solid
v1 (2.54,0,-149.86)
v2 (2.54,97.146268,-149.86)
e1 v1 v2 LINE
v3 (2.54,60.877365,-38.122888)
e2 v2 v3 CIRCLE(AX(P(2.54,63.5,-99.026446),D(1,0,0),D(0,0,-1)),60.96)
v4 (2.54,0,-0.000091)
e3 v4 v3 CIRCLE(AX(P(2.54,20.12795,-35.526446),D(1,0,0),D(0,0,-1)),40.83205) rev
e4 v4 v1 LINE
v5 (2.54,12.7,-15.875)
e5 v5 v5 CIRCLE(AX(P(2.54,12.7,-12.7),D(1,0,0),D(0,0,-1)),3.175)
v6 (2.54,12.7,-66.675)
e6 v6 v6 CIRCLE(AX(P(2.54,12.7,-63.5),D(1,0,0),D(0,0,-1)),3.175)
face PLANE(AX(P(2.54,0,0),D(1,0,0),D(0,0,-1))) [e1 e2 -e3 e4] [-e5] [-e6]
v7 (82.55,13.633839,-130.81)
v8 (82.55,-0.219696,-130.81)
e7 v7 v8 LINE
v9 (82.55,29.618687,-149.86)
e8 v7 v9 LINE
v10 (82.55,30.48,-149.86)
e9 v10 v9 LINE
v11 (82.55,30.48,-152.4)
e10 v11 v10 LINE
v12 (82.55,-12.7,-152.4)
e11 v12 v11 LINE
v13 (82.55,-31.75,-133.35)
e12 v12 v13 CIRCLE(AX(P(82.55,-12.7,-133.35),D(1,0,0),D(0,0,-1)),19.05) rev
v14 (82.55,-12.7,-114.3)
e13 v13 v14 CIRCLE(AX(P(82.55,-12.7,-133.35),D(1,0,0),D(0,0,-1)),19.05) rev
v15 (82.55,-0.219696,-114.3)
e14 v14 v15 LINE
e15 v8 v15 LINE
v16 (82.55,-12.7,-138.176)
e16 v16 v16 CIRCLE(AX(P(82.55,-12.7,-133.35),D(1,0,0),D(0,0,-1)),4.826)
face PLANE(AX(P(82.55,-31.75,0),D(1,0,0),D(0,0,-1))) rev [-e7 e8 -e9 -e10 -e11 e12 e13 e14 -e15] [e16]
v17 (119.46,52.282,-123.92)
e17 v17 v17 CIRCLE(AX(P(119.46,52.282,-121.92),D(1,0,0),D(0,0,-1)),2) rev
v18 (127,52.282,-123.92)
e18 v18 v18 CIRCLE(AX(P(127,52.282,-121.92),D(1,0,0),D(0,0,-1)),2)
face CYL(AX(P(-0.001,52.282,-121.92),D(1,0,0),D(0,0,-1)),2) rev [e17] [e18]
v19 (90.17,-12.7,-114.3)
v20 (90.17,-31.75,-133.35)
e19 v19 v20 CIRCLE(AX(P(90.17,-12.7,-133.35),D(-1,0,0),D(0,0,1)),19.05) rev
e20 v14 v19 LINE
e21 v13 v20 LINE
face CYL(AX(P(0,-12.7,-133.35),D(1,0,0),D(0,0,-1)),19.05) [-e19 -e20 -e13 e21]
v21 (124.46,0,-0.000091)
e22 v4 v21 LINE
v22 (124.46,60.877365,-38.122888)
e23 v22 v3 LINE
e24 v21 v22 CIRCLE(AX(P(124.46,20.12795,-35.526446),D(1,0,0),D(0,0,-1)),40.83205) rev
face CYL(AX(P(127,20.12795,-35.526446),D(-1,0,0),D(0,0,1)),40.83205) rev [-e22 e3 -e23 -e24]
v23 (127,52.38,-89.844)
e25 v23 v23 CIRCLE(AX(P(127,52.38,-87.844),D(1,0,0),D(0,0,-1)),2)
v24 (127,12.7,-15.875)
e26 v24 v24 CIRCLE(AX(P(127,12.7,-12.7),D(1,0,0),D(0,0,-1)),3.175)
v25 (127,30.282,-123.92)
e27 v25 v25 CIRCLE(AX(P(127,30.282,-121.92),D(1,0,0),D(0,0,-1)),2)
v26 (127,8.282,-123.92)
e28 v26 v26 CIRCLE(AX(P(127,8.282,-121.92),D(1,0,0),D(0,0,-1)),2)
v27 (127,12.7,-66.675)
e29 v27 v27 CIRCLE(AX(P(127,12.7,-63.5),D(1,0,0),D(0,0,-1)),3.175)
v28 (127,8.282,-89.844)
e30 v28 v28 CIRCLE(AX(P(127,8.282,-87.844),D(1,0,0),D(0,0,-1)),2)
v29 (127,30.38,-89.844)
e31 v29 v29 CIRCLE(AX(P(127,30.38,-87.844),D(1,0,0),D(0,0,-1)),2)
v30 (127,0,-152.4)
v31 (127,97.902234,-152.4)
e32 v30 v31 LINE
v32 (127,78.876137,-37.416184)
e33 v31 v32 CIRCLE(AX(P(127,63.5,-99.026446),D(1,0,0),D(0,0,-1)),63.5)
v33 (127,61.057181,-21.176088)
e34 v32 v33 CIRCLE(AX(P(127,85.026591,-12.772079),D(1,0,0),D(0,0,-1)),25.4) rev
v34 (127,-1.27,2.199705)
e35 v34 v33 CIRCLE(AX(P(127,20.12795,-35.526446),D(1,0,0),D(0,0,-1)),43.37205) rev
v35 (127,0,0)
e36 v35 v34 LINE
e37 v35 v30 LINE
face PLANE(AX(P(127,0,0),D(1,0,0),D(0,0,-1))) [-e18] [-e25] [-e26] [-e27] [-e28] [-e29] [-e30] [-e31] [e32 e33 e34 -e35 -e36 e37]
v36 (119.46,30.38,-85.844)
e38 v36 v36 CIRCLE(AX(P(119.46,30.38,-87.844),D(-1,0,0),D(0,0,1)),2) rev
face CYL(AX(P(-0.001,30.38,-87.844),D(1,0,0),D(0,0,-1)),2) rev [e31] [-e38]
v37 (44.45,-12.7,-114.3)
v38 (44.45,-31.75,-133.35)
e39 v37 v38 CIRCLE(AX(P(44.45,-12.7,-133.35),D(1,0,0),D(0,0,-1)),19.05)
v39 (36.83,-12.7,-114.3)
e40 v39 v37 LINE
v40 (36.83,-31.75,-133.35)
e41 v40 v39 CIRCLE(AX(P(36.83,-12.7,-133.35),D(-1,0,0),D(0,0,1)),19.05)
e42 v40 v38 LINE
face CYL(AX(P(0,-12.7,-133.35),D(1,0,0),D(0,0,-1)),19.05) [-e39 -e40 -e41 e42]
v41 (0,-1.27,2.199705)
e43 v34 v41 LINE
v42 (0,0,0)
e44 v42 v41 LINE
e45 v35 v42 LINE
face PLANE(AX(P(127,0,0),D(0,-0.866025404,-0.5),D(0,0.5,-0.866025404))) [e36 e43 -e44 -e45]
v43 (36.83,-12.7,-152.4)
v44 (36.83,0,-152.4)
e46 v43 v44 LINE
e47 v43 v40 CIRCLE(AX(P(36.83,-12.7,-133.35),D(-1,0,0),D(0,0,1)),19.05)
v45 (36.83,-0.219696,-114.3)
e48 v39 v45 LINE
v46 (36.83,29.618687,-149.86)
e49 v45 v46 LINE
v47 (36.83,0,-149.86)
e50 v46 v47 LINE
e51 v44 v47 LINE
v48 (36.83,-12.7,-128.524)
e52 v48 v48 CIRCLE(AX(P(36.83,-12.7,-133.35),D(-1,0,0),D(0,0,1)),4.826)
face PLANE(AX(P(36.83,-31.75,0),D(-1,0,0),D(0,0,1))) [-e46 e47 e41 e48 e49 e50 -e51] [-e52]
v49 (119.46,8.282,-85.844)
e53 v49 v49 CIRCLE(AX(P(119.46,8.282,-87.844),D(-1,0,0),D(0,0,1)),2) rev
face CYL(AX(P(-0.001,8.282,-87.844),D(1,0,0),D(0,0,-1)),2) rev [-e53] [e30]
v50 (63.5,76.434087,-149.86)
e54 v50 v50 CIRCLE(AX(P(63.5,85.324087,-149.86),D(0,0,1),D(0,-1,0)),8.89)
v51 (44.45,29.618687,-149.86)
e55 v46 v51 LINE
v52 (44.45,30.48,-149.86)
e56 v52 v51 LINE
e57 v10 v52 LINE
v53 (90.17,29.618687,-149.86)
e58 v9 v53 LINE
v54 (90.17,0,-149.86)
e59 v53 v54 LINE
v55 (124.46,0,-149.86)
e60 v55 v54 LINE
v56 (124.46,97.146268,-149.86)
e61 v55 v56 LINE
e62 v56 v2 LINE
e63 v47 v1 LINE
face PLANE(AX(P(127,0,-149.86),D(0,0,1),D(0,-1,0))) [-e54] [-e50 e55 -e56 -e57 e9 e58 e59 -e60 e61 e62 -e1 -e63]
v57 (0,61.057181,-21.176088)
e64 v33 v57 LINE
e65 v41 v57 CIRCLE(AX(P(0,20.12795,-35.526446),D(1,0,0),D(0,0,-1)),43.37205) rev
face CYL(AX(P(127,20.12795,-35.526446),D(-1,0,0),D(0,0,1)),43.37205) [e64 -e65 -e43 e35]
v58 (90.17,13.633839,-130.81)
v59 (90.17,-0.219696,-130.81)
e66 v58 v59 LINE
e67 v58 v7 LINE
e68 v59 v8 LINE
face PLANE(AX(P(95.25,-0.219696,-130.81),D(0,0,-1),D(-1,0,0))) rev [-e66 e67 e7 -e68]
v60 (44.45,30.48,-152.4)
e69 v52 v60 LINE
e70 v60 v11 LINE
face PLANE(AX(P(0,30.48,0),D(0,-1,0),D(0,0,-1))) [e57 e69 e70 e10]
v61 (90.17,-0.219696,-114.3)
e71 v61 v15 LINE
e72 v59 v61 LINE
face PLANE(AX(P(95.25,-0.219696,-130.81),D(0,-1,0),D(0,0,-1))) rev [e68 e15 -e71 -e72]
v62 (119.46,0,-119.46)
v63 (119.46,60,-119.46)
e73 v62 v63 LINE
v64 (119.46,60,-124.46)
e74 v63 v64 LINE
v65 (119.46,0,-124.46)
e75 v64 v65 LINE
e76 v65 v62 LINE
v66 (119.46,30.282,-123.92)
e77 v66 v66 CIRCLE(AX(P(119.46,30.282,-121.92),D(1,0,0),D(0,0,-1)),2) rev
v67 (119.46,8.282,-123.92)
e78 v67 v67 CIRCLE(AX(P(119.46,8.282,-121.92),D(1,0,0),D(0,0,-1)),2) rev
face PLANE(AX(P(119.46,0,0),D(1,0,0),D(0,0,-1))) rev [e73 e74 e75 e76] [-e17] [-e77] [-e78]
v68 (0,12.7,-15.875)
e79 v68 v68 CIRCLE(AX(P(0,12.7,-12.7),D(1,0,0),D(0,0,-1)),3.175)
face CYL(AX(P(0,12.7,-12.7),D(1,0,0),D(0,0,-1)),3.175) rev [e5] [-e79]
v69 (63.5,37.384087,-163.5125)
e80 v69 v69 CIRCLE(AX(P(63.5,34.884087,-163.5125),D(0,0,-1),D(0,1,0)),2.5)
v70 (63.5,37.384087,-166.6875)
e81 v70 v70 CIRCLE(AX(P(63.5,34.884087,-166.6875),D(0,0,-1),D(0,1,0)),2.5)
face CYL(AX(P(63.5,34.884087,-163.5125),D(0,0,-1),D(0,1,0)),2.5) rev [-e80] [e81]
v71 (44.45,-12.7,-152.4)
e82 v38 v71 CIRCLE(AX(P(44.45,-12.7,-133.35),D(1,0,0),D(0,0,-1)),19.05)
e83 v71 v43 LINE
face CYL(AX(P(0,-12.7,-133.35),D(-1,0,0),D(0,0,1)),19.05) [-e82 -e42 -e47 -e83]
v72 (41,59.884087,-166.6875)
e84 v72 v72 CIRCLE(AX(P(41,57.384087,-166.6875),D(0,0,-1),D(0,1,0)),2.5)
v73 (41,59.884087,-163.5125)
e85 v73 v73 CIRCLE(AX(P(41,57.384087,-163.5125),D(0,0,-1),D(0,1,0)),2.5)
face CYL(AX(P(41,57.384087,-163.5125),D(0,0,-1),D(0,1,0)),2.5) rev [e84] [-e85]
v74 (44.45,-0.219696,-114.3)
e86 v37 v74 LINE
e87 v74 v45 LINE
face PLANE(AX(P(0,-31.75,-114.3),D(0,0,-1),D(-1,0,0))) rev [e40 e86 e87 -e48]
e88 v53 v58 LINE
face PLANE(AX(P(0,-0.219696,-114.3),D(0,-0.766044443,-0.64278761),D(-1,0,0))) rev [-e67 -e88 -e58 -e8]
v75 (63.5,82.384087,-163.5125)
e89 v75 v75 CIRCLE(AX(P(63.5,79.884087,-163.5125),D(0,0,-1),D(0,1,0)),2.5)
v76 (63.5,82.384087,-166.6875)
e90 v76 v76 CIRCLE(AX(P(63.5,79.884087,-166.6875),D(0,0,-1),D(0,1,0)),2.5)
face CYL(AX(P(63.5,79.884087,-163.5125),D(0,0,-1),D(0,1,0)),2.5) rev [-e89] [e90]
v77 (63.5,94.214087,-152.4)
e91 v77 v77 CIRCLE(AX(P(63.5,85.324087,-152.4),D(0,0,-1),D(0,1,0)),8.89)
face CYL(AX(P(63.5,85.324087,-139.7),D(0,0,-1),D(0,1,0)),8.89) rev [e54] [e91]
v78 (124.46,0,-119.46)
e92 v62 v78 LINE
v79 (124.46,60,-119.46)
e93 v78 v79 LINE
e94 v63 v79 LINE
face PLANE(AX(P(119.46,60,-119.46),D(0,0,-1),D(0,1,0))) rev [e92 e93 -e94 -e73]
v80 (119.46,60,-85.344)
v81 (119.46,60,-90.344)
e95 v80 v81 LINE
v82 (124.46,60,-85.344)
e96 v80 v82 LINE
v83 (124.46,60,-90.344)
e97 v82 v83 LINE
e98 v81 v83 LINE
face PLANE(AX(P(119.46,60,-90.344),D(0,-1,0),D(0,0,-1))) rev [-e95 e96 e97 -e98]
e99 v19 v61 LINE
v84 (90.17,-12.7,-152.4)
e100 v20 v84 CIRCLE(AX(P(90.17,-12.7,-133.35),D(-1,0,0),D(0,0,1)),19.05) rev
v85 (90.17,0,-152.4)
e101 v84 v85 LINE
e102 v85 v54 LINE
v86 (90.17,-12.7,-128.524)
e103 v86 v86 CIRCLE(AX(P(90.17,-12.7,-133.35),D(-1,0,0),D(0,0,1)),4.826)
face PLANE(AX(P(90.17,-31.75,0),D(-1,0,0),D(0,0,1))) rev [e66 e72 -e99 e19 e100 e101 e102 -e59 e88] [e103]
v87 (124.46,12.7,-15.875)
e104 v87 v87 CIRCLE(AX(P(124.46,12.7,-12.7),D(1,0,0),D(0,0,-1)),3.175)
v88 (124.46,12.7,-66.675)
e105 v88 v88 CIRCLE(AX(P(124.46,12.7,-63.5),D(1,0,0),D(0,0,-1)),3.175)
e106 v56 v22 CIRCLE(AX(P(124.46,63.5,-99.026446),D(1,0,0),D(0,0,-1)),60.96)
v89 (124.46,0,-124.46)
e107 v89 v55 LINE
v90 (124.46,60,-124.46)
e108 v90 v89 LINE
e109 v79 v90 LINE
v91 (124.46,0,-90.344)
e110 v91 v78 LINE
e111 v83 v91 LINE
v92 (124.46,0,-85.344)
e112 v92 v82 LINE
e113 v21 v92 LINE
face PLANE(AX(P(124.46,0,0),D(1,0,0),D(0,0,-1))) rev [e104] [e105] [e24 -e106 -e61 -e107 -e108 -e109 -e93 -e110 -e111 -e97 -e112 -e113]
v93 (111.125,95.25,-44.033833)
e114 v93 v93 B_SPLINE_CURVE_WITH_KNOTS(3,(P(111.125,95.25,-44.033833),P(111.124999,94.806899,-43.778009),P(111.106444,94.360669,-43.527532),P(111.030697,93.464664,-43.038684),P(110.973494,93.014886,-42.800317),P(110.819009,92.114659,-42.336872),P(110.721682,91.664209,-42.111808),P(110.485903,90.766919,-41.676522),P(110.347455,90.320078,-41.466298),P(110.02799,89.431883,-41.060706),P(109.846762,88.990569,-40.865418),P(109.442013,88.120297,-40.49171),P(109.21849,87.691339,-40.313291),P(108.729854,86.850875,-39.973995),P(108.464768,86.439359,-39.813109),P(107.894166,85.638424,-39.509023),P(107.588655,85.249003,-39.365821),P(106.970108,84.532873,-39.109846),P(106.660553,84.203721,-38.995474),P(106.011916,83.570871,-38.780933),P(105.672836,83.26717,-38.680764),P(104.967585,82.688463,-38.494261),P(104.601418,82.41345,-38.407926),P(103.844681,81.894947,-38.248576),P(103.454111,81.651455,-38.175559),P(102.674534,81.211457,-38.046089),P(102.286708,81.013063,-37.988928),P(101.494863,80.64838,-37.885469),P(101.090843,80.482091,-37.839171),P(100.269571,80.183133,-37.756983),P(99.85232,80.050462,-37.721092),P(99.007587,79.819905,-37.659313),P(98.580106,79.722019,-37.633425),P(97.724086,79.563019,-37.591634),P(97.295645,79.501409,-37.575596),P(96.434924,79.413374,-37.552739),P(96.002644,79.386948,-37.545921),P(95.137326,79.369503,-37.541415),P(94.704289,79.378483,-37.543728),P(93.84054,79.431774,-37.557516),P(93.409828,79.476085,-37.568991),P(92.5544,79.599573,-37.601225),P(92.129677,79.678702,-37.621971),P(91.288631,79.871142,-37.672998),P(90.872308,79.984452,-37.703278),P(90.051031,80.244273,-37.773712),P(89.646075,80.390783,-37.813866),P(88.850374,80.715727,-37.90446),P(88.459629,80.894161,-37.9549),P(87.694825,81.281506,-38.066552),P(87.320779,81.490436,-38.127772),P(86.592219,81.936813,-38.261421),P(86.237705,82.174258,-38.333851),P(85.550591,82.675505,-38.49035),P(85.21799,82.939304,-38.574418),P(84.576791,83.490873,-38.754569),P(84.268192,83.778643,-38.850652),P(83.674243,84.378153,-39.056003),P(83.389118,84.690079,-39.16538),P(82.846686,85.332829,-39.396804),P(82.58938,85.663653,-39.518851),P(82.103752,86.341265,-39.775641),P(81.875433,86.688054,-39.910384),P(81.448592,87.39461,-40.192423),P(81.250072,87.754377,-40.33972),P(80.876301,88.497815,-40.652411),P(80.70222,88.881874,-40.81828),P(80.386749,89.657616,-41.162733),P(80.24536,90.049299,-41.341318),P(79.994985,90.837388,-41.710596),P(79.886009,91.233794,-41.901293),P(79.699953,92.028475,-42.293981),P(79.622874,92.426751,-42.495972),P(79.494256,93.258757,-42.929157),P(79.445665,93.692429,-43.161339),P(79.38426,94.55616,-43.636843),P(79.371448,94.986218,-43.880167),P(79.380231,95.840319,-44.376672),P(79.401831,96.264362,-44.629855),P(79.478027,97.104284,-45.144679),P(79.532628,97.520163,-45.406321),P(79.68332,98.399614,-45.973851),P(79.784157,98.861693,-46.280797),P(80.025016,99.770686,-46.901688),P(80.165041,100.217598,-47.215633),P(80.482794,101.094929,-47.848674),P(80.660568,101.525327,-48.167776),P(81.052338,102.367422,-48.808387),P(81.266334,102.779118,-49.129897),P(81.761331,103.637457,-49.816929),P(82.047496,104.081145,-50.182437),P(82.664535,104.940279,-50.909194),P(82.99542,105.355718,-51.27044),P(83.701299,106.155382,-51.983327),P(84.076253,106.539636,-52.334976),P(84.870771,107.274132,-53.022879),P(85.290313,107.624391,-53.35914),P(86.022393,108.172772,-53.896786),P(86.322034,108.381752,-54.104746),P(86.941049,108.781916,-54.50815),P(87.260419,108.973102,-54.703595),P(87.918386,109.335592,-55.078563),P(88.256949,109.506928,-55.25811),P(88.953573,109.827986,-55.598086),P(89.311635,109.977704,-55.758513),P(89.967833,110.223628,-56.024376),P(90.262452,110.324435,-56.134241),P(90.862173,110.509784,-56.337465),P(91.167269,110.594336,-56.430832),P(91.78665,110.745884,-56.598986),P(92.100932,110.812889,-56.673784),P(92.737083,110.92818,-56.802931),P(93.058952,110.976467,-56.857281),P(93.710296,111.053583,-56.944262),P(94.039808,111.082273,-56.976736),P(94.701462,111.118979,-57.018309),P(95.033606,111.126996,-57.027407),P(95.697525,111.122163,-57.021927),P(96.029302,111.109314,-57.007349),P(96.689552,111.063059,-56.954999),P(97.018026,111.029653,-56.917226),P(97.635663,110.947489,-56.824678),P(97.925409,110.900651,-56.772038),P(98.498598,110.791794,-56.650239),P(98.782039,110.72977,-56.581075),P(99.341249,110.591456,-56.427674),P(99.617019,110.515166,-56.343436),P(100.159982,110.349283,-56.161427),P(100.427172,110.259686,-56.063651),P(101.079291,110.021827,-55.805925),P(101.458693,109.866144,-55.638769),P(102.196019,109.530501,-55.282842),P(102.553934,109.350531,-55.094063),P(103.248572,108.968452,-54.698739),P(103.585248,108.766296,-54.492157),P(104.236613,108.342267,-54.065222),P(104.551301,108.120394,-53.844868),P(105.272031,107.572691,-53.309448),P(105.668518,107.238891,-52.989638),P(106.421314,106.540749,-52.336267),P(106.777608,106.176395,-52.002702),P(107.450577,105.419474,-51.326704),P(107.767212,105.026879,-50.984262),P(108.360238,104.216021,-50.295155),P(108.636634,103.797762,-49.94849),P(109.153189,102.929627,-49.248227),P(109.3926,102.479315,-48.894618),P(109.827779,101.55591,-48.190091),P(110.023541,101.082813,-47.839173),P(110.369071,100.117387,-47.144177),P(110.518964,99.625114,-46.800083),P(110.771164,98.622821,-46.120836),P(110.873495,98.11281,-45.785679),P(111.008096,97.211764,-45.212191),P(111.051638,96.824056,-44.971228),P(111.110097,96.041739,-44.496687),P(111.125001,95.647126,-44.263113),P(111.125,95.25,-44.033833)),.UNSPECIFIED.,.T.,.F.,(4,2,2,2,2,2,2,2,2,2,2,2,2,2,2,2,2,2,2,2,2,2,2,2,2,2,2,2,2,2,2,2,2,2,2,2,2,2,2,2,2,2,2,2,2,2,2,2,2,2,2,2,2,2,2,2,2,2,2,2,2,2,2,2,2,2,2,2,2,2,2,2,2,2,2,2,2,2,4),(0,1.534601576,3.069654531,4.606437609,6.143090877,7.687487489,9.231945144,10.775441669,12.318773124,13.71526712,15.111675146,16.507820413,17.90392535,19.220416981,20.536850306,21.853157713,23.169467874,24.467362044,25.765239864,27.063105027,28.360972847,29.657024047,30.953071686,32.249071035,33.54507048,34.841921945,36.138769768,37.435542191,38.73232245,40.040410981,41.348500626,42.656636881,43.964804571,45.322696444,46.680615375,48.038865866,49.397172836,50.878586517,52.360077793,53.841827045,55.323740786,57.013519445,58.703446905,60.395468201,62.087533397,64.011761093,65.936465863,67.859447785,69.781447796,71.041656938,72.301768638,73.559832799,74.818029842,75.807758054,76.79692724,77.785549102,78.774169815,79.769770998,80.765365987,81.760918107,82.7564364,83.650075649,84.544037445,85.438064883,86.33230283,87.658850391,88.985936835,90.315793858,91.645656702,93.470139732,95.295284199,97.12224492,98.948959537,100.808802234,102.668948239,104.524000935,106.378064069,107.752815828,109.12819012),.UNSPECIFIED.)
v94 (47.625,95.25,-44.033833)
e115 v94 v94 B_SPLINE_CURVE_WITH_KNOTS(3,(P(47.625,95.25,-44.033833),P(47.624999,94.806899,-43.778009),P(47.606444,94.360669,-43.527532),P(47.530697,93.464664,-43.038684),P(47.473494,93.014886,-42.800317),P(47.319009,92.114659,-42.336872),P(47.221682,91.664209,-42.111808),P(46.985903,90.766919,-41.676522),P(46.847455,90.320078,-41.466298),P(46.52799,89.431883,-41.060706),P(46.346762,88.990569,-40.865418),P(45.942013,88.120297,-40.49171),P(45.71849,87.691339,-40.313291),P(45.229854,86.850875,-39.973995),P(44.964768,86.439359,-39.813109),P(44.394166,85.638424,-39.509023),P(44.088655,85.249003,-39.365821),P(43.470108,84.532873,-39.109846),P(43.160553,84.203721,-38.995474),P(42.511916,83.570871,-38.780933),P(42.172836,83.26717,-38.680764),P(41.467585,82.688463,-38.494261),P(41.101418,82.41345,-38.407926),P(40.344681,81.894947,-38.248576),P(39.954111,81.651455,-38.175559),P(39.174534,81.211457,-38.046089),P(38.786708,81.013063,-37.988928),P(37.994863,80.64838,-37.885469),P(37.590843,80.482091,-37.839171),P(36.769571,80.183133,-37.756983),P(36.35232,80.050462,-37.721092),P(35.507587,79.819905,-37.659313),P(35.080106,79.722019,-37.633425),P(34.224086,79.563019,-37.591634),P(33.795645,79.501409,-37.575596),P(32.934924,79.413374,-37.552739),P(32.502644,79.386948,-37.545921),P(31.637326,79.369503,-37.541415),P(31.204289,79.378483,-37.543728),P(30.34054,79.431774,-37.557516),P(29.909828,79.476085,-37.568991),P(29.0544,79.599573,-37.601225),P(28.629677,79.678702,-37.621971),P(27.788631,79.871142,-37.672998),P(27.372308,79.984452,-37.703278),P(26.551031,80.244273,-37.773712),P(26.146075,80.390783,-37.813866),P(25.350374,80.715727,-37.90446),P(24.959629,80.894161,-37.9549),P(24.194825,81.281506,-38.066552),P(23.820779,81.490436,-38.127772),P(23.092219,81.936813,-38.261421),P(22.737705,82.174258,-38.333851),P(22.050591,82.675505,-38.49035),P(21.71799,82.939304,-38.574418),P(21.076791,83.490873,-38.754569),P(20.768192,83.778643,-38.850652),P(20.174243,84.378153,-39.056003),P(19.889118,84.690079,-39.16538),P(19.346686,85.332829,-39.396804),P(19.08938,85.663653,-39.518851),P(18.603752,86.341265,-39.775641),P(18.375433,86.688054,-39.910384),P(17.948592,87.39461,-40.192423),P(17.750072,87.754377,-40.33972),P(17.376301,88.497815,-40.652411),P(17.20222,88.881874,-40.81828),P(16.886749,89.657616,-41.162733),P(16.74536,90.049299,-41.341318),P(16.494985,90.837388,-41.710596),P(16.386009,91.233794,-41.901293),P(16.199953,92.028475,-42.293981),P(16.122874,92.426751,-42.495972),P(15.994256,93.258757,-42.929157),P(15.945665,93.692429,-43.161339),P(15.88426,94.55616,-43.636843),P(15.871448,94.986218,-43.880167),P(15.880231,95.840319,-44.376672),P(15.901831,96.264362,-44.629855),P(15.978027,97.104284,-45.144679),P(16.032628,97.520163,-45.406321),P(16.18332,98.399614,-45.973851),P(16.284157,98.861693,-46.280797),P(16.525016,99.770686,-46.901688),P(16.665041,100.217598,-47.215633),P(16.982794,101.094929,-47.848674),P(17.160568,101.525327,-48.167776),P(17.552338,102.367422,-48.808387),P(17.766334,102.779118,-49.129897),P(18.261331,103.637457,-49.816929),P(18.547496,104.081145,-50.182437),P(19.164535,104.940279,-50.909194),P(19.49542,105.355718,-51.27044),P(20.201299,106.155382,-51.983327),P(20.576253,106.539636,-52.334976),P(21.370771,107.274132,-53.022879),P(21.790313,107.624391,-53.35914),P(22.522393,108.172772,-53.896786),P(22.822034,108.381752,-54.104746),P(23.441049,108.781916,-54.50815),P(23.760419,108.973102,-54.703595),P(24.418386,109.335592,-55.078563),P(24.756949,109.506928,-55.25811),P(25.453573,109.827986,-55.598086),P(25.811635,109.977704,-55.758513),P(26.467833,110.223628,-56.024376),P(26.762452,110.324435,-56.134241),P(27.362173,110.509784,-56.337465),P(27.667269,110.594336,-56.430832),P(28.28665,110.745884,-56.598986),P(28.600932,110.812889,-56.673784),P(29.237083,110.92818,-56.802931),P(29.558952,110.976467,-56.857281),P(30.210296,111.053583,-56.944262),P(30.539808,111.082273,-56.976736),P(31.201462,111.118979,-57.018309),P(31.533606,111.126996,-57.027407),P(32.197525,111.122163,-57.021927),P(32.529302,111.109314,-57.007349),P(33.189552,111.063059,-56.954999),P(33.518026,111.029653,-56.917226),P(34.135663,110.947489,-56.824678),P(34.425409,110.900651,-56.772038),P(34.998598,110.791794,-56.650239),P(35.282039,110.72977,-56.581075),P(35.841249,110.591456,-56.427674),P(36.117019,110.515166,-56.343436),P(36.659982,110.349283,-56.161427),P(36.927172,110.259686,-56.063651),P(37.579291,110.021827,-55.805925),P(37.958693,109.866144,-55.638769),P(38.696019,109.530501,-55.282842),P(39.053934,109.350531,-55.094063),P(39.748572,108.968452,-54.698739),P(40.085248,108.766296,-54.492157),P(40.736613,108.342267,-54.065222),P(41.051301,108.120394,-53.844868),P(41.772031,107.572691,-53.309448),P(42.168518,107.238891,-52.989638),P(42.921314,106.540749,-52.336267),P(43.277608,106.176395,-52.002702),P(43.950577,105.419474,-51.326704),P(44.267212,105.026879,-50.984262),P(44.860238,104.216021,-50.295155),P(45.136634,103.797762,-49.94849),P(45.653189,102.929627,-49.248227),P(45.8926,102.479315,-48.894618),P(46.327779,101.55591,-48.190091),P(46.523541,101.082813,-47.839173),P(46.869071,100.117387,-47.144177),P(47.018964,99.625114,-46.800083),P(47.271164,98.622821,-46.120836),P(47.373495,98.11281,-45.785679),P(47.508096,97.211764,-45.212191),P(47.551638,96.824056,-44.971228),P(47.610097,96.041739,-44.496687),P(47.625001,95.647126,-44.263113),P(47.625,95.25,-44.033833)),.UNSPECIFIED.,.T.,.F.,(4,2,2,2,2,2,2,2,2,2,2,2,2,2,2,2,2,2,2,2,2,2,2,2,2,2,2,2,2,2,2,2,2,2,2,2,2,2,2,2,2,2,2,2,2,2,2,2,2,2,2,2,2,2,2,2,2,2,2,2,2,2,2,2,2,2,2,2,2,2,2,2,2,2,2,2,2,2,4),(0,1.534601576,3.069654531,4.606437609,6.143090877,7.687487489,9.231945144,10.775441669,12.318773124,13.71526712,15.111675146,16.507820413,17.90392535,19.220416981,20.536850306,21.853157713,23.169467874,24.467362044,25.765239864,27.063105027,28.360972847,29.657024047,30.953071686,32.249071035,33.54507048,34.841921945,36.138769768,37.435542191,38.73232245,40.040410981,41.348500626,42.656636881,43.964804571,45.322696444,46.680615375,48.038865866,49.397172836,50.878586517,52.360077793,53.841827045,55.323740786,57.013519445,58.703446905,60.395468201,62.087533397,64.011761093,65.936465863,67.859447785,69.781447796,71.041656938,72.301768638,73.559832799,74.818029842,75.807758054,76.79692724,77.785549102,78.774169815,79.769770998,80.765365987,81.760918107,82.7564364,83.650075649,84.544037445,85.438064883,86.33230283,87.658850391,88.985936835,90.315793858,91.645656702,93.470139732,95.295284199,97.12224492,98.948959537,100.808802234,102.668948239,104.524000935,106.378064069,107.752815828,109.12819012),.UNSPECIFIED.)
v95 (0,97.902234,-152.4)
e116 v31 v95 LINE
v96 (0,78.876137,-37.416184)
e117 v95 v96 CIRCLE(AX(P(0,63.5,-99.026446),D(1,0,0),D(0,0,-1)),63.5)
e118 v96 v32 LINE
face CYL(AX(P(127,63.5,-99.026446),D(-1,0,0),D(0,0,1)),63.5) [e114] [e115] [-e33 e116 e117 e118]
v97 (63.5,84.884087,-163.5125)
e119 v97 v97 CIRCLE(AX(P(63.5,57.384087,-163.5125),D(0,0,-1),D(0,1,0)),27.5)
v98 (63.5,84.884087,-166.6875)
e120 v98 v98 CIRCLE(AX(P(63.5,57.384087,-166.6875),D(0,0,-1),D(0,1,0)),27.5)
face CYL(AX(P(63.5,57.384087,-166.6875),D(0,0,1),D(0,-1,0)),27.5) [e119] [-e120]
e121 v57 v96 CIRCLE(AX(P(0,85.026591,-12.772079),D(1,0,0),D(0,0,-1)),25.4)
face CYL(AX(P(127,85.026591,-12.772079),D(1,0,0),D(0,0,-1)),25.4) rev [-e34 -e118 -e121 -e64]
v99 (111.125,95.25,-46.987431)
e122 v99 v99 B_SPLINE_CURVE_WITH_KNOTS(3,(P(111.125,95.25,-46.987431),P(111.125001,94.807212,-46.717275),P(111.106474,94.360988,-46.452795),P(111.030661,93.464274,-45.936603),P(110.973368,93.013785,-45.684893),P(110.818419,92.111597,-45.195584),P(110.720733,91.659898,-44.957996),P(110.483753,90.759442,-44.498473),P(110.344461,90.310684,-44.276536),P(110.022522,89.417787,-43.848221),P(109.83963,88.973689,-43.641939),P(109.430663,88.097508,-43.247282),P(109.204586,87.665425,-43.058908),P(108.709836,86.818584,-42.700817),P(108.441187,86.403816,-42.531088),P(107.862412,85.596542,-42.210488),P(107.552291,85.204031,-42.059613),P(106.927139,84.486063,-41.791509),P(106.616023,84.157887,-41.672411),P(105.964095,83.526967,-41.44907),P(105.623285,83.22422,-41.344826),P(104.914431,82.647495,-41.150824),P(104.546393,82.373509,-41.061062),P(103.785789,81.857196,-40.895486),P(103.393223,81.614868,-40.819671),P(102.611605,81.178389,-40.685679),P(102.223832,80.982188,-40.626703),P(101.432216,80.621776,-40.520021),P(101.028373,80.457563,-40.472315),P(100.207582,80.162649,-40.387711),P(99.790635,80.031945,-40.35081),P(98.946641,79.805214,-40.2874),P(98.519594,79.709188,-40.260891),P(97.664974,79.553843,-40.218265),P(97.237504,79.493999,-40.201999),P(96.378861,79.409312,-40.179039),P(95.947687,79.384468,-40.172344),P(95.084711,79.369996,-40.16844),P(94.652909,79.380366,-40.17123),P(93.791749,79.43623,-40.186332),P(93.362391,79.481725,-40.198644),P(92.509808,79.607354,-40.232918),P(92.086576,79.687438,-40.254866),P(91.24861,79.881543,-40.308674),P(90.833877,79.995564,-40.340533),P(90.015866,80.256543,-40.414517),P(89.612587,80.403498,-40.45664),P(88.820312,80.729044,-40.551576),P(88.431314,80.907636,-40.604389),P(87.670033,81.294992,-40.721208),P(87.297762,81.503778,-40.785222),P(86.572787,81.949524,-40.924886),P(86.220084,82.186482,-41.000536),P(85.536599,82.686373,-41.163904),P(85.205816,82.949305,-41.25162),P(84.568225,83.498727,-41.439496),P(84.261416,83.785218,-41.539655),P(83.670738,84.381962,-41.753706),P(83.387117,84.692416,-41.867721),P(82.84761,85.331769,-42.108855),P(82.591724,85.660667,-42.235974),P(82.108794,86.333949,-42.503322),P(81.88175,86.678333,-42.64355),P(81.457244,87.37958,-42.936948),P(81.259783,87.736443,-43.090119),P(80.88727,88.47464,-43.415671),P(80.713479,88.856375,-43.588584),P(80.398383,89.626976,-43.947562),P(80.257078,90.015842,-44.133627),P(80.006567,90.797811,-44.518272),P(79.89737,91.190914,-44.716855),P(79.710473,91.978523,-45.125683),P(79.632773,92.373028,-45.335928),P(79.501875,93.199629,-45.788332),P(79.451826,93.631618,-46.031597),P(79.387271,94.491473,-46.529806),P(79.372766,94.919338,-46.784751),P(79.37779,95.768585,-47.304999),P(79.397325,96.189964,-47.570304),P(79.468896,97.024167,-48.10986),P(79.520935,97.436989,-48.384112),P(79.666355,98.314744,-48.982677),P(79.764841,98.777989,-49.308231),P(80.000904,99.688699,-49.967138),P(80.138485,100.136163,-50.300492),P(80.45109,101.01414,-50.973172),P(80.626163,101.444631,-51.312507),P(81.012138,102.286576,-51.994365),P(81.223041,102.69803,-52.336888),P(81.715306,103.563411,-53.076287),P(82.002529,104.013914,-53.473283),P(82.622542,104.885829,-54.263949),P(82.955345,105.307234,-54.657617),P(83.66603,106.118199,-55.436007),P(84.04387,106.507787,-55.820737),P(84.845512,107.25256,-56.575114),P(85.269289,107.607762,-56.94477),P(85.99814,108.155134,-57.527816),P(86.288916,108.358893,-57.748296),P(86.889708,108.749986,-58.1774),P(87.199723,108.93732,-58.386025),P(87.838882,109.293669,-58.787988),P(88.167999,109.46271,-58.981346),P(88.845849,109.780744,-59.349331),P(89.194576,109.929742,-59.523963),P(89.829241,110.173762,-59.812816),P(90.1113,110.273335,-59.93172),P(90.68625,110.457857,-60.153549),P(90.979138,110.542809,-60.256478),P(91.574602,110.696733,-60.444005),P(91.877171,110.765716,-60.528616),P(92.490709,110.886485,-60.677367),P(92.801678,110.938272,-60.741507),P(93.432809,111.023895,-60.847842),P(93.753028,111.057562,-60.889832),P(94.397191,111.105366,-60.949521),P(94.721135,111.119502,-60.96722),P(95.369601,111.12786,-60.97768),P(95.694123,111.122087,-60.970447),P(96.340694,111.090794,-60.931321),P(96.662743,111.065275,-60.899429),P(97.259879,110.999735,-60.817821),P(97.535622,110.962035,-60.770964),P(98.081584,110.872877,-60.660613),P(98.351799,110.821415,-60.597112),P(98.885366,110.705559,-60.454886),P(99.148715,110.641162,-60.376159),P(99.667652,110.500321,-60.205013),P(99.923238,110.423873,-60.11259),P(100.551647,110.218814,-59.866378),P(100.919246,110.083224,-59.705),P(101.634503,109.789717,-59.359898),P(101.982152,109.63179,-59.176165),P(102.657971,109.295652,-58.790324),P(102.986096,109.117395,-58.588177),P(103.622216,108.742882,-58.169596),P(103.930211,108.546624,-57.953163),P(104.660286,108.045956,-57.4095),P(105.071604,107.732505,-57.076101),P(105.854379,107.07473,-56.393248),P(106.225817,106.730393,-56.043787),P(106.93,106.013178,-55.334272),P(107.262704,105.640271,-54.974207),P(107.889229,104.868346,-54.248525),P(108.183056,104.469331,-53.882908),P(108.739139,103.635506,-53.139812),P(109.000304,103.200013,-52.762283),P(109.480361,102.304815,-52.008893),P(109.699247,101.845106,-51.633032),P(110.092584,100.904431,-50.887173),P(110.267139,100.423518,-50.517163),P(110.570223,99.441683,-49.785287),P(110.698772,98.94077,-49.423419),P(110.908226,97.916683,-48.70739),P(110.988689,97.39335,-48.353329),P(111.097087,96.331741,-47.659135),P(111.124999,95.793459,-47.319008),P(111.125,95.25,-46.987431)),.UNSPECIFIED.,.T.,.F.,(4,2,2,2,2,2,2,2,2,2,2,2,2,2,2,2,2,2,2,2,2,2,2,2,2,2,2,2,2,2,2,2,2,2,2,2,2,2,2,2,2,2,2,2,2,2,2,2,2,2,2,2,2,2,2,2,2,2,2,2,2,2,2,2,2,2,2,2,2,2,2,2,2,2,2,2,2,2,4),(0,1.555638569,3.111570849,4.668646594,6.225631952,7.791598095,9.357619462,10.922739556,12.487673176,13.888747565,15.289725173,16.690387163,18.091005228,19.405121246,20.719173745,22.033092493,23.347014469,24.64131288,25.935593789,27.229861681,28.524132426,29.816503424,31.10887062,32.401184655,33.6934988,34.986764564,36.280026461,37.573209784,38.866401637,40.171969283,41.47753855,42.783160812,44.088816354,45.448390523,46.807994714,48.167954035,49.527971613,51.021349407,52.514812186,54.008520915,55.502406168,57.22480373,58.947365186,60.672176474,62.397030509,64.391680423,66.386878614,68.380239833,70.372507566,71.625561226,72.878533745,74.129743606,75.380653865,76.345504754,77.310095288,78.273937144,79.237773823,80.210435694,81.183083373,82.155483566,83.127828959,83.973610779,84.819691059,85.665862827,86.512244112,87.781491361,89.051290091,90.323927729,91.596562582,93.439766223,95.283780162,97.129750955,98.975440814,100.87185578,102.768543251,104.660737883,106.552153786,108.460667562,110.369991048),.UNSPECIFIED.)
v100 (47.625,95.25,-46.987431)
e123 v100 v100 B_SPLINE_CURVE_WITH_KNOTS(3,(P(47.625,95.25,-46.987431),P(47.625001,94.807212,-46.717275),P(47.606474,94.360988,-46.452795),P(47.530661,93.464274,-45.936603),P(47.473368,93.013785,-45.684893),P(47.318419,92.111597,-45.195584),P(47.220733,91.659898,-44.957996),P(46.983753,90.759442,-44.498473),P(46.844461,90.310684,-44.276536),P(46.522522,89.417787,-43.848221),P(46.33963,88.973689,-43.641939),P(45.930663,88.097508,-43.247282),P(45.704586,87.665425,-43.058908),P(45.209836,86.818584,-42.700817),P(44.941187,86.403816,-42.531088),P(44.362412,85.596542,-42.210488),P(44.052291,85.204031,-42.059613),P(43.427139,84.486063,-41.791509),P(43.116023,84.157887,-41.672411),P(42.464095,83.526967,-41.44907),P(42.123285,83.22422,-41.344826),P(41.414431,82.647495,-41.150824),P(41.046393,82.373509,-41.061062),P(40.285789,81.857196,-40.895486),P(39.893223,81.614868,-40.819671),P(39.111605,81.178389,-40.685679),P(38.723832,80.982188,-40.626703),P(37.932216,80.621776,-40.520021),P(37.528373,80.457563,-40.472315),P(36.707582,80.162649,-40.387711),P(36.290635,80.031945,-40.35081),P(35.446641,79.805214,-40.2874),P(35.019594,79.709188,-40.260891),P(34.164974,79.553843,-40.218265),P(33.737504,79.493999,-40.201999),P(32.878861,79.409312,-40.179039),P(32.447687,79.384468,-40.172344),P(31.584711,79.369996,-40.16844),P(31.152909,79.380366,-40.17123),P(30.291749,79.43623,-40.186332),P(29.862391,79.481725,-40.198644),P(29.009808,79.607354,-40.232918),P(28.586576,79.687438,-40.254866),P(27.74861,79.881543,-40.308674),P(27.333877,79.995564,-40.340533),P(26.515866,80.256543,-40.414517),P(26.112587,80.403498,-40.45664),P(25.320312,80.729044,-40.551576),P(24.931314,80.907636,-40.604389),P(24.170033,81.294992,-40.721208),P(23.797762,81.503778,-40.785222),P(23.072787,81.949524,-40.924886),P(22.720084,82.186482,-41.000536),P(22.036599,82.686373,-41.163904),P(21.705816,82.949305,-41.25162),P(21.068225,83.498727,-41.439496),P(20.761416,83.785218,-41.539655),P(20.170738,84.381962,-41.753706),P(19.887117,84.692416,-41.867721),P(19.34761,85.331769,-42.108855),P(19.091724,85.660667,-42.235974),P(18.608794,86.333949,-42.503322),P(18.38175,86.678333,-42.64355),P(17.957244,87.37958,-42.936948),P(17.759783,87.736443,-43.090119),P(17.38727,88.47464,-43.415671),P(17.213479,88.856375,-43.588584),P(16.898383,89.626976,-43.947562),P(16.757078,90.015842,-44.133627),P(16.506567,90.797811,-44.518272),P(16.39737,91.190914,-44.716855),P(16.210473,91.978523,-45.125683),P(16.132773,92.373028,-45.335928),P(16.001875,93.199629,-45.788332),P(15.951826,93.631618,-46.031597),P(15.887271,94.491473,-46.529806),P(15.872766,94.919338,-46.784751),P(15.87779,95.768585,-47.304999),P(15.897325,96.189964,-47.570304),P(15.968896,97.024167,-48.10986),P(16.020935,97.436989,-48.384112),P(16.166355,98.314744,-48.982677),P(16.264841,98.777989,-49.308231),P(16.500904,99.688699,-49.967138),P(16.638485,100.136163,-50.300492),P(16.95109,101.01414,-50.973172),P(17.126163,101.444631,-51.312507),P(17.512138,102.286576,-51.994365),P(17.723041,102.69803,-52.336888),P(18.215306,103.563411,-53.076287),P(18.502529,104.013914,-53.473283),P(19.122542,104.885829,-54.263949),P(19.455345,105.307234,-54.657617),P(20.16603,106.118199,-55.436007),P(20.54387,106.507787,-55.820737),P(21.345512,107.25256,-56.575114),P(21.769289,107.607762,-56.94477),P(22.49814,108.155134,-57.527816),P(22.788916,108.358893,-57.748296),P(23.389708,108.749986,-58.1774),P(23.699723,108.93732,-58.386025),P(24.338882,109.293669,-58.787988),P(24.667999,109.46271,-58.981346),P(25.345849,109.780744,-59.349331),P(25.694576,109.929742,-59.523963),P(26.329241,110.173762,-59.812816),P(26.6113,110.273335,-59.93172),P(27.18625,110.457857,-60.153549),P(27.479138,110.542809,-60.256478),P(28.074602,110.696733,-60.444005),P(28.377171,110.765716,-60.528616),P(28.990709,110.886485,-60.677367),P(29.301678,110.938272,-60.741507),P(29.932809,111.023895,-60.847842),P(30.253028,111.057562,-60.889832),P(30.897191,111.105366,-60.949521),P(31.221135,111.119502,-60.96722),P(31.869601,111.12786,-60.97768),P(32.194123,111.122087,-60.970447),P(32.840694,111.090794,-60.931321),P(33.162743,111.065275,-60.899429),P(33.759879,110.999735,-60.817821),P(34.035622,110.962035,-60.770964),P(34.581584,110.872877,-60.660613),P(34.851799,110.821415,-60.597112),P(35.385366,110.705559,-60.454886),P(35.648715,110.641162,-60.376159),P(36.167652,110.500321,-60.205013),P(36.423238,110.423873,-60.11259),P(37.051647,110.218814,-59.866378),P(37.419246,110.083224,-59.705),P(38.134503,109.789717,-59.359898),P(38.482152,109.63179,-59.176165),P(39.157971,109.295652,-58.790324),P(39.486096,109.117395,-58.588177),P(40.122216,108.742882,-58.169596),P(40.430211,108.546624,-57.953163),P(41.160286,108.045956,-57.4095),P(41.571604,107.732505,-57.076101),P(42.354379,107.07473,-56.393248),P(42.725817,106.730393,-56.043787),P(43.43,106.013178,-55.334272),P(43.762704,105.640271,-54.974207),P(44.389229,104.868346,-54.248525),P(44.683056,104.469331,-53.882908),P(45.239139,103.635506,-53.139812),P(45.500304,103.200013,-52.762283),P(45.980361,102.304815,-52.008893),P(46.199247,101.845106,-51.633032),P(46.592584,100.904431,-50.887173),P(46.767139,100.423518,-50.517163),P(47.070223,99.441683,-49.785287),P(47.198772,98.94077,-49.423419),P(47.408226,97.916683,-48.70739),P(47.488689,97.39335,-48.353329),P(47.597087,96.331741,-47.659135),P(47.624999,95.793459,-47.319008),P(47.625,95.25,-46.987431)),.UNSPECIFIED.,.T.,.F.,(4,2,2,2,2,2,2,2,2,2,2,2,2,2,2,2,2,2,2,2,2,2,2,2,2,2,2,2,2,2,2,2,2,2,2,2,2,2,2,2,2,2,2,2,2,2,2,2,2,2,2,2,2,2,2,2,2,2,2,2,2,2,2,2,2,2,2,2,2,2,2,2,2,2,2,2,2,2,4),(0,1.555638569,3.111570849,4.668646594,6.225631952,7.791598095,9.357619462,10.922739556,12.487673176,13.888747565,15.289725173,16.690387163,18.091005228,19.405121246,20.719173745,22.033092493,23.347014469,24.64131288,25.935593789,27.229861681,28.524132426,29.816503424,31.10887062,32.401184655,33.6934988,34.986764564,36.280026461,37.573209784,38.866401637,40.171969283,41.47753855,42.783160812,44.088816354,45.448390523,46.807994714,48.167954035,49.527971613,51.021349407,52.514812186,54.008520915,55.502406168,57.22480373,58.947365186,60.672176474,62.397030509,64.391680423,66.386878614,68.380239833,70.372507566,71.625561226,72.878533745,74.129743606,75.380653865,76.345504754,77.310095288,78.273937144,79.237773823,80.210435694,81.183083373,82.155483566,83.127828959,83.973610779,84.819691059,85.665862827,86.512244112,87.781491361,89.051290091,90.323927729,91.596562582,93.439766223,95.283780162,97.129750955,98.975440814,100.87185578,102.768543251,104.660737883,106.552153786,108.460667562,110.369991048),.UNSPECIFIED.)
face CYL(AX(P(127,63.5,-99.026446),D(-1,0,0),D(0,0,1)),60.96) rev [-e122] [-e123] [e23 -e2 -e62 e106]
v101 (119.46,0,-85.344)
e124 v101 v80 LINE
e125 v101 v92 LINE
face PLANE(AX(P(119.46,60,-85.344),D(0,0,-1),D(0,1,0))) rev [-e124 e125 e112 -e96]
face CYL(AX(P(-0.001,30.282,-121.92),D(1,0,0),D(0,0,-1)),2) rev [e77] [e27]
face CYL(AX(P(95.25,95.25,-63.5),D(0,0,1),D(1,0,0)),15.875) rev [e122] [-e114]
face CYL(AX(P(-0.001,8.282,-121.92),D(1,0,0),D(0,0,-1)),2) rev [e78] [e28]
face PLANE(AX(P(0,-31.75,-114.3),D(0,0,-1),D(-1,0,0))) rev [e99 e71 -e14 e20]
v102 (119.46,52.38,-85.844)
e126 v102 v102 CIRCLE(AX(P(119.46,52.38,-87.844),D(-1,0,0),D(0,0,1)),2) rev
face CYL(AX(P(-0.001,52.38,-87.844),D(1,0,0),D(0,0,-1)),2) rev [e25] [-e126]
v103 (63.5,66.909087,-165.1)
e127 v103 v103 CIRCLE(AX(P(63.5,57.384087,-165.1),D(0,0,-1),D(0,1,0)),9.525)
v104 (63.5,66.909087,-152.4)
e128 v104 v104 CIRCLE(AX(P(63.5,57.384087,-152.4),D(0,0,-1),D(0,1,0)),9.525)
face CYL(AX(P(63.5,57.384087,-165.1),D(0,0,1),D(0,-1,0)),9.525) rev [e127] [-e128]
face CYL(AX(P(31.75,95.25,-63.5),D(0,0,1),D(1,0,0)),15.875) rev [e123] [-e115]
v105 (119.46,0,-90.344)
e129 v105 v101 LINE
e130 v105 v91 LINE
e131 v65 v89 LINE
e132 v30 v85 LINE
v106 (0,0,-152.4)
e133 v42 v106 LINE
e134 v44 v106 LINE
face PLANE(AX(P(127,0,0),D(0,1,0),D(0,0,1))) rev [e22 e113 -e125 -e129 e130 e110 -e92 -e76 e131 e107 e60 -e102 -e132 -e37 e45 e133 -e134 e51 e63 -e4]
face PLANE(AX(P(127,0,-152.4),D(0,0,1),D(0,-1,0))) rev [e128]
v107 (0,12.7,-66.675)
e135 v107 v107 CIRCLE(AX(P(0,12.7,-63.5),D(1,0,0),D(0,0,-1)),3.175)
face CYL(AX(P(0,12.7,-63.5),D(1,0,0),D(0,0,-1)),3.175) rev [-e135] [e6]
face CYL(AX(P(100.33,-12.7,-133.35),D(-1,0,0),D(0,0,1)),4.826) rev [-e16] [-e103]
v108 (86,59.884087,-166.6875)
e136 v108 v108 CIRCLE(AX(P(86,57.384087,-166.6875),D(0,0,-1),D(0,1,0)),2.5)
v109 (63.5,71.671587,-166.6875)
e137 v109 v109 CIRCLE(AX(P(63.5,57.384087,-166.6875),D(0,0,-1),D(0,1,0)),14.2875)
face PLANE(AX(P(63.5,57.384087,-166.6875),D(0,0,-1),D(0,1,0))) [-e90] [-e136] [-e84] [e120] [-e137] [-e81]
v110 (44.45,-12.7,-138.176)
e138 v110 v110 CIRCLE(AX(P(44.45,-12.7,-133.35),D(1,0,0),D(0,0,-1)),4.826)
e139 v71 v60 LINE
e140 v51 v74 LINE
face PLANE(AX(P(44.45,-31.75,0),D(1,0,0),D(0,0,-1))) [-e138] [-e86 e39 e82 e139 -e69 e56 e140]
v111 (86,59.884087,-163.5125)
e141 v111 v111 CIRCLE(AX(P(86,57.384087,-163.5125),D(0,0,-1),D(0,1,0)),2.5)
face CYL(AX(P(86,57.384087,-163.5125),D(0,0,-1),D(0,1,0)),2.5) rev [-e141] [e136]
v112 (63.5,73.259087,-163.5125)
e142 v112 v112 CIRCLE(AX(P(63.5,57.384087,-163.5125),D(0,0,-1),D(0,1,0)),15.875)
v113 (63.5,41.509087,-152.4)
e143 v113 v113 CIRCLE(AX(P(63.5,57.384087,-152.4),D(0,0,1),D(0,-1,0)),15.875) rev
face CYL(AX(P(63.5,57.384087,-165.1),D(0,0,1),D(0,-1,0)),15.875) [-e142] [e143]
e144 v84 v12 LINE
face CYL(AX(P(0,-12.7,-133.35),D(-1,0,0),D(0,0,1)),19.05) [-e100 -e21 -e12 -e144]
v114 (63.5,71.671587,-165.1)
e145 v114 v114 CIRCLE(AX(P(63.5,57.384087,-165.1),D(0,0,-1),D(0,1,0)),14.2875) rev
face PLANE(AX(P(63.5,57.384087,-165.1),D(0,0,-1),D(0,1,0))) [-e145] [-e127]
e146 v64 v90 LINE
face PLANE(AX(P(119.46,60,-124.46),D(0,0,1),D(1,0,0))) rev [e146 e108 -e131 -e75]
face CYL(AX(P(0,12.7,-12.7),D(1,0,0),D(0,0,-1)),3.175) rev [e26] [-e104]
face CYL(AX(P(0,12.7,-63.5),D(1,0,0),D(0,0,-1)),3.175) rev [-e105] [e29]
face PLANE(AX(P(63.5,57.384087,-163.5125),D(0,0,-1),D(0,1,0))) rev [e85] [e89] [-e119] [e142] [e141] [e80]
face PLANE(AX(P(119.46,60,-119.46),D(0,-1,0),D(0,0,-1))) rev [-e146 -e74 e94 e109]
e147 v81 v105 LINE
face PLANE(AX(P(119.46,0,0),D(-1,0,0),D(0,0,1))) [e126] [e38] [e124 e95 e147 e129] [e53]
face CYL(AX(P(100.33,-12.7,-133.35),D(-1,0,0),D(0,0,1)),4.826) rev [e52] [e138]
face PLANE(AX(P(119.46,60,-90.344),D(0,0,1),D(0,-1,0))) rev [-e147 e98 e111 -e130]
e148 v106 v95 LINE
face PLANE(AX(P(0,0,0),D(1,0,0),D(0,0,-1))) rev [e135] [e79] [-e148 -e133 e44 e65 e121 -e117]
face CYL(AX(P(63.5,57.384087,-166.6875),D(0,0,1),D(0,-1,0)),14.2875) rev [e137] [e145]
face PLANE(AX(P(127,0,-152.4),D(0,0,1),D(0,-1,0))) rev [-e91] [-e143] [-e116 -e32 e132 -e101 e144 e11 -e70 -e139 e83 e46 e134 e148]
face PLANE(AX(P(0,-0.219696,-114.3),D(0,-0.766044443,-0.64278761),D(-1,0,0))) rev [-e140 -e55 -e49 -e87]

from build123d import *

# Parameters (mm, degrees)
BOSS_EXTRUDE1_DEPTH = 127
SHELL1_START        = 2.54
SHELL1_DEPTH        = 121.92
CUT_EXTRUDE5_DEPTH  = 236.549909786
SKETCH20_R          = 3.175
CUT_EXTRUDE7_DEPTH  = 236.549909786
FILLET1_R           = 25.4
SKETCH21_R          = 15.875
SKETCH21_R_2        = 9.525
BOSS_EXTRUDE2_DEPTH = 12.7
SKETCH22_R          = 27.5
SKETCH22_R_2        = 14.2875
BOSS_EXTRUDE4_DEPTH = 1.5875
SKETCH23_R          = 2.5
CUT_EXTRUDE8_DEPTH  = 3.175
SKETCH24_R          = 8.89
CUT_EXTRUDE9_DEPTH  = 12.7
SKETCH25_R          = 15.875
CUT_EXTRUDE10_DEPTH = 63.5
SKETCH26_W          = 7.62
SKETCH26_H          = 35.56
SKETCH26_H_2        = 2.54
BOSS_EXTRUDE5_DEPTH = 31.75
CHAMFER1_SIZE       = 38.1
CHAMFER1_SIZE_2     = 31.969695948
FILLET2_R           = 19.05
SKETCH27_R          = 4.826
CUT_EXTRUDE11_DEPTH = 63.5
SKETCH28_W          = 5
SKETCH28_H          = 60
BOSS_EXTRUDE6_DEPTH = 5
CUT_EXTRUDE13_REACH = 247.036
SKETCH29_R          = 2
SKETCH30_W          = 31.127388046
SKETCH30_H          = 24.370388593
CUT_EXTRUDE14_DEPTH = 12.7
SKETCH31_W          = 38.1
SKETCH31_H          = 2.54
CUT_EXTRUDE15_DEPTH = 30.48


# Read off the part's stored shape, not the designer's step: Shell1
# Some blends are built 0.0001 mm under size
with BuildPart() as part:
    # Sketch3 → Boss-Extrude1 (new body)
    with BuildSketch(Plane(origin=(0, 0, 0), x_dir=(0, 0, -1), z_dir=(1, 0, 0))):
        with BuildLine():
            Line((0, 0), (152.4, 0))
            Line((152.4, 0), (152.4, 97.902234225))
            ThreePointArc((152.4, 97.902234225), (81.095616097, 124.415805368), (35.526445872, 63.5))
            ThreePointArc((35.526445872, 63.5), (-1.951598781, 41.957537243), (-2.199704526, -1.27))
            Line((-2.199704526, -1.27), (0, 0))
        make_face()
    extrude(amount=BOSS_EXTRUDE1_DEPTH)

    # Shell1 outline → Shell1 (cut)
    with BuildSketch(Plane.YZ.offset(SHELL1_START)):
        with BuildLine():
            Line((0, -149.86), (97.146268362, -149.86))
            ThreePointArc((97.146268362, -149.86), (121.481997306, -80.205989224), (60.877364675, -38.122887815))
            ThreePointArc((60.877364675, -38.122887815), (41.799316368, -0.919969929), (0, -9.0799e-05))
            Line((0, -9.0799e-05), (0, -149.86))
        make_face()
    extrude(amount=SHELL1_DEPTH, mode=Mode.SUBTRACT)

    # Sketch19 → Cut-Extrude5 (cut, through all)
    with BuildSketch(Plane(origin=(127, 0, 0), x_dir=(0, 0, -1), z_dir=(1, 0, 0))):
        with BuildLine():
            ThreePointArc((9.525, 12.7), (10.45493597, 10.45493597), (12.7, 9.525))
            Line((12.7, 9.525), (12.7, 12.7))
            Line((12.7, 12.7), (9.525, 12.7))
        make_face()
        with BuildLine():
            Line((12.7, 12.7), (12.7, 9.525))
            ThreePointArc((12.7, 9.525), (14.94506403, 10.45493597), (15.875, 12.7))
            ThreePointArc((15.875, 12.7), (12.7, 15.875), (9.525, 12.7))
            Line((9.525, 12.7), (12.7, 12.7))
        make_face()
    extrude(amount=-CUT_EXTRUDE5_DEPTH, mode=Mode.SUBTRACT)

    # Sketch20 → Cut-Extrude7 (cut, through all)
    with BuildSketch(Plane(origin=(127, 0, 0), x_dir=(0, 0, -1), z_dir=(1, 0, 0))):
        with Locations((63.5, 12.7)):
            Circle(SKETCH20_R)
    extrude(amount=-CUT_EXTRUDE7_DEPTH, mode=Mode.SUBTRACT)

    # Fillet1
    fillet1_edges = [part.edges().sort_by_distance(p)[0] for p in [
        (63.5, 63.5, -35.526445872),
    ]]
    fillet(fillet1_edges, radius=FILLET1_R)

    # Sketch21 → Boss-Extrude2 (add)
    with BuildSketch(Plane(origin=(0, 0, -152.4), x_dir=(-1, 0, 0), z_dir=(0, 0, -1))):
        with Locations(Location((-63.5, 57.384086824, 0), (0, 0, 270))):
            Circle(SKETCH21_R)
        with Locations(Location((-63.5, 57.384086824, 0), (0, 0, 90))):
            Circle(SKETCH21_R_2, mode=Mode.SUBTRACT)
    extrude(amount=BOSS_EXTRUDE2_DEPTH)

    # Sketch22 → Boss-Extrude4 (add, symmetric)
    with BuildSketch(Plane(origin=(0, 0, -165.1), x_dir=(-1, 0, 0), z_dir=(0, 0, -1))):
        with Locations(Location((-63.5, 57.384086824, 0), (0, 0, 90))):
            Circle(SKETCH22_R)
        with Locations(Location((-63.5, 57.384086824, 0), (0, 0, 90))):
            Circle(SKETCH22_R_2, mode=Mode.SUBTRACT)
    extrude(amount=BOSS_EXTRUDE4_DEPTH, both=True)

    # Sketch23 → Cut-Extrude8 (cut)
    with BuildSketch(Plane(origin=(0, 0, -166.6875), x_dir=(-1, 0, 0), z_dir=(0, 0, -1))):
        with Locations(Location((-63.5, 79.884086824, 0), (0, 0, 90))):
            Circle(SKETCH23_R)
        with Locations(Location((-41, 57.384086824, 0), (0, 0, 90))):
            Circle(SKETCH23_R)
        with Locations(Location((-63.5, 34.884086824, 0), (0, 0, 90))):
            Circle(SKETCH23_R)
        with Locations(Location((-86, 57.384086824, 0), (0, 0, 90))):
            Circle(SKETCH23_R)
    extrude(amount=-CUT_EXTRUDE8_DEPTH, mode=Mode.SUBTRACT)

    # Sketch24 → Cut-Extrude9 (cut)
    with BuildSketch(Plane(origin=(0, 0, -152.4), x_dir=(-1, 0, 0), z_dir=(0, 0, -1))):
        with Locations(Location((-63.5, 85.324086824, 0), (0, 0, 90))):
            Circle(SKETCH24_R)
    extrude(amount=-CUT_EXTRUDE9_DEPTH, mode=Mode.SUBTRACT)

    # Sketch25 → Cut-Extrude10 (cut)
    with BuildSketch(Plane.XY):
        with Locations((31.75, 95.25)):
            Circle(SKETCH25_R)
        with Locations((95.25, 95.25)):
            Circle(SKETCH25_R)
    extrude(amount=-CUT_EXTRUDE10_DEPTH, mode=Mode.SUBTRACT)

    # Sketch26 → Boss-Extrude5 (add, symmetric)
    with BuildSketch(Plane.XZ):
        with Locations((40.64, -132.08)):
            Rectangle(SKETCH26_W, SKETCH26_H)
        with Locations((86.36, -132.08)):
            Rectangle(SKETCH26_W, SKETCH26_H)
        with Locations((86.36, -151.13)):
            Rectangle(SKETCH26_W, SKETCH26_H_2)
        with Locations((40.64, -151.13)):
            Rectangle(SKETCH26_W, SKETCH26_H_2)
    extrude(amount=BOSS_EXTRUDE5_DEPTH, both=True)

    # Chamfer1
    # the kernel refuses this chamfer: 38.1, 31.969695948 mm, written as the material it takes off along each edge
    with BuildSketch(Plane(origin=(90.17, 31.75, -114.3), x_dir=(0, 0.024939322090234358, -0.9996889667359941), z_dir=(-1, 0, 0))) as chamfer1_piece_1_section:
        Polygon((CHAMFER1_SIZE * 0.999688966736, CHAMFER1_SIZE * 0.0249393220902), (-CHAMFER1_SIZE_2 * 0.0249393220901, CHAMFER1_SIZE_2 * 0.999688966731), (0, 0), align=None)
    chamfer1_piece_1 = extrude(amount=105.819172537, mode=Mode.PRIVATE)
    chamfer1_piece_1 = split(chamfer1_piece_1, bisect_by=Plane(origin=(86.36, 21.050034317, -149.86), z_dir=(0, 0, 1)), keep=Keep.TOP, mode=Mode.PRIVATE)
    chamfer1_piece_1 = split(chamfer1_piece_1, bisect_by=Plane(origin=(2.54, 21.050034317, -126.894759963), z_dir=(1, 0, 0)), keep=Keep.TOP, mode=Mode.PRIVATE)
    add(chamfer1_piece_1, mode=Mode.SUBTRACT)
    with BuildSketch(Plane(origin=(142.649172537, 31.75, -114.3), x_dir=(0, -0.9993728857116146, 0.03540953691366268), z_dir=(-1, 0, 0))) as chamfer1_piece_2_section:
        Polygon((CHAMFER1_SIZE_2 * 0.999372885707, -CHAMFER1_SIZE_2 * 0.0354095369135), (-CHAMFER1_SIZE * 0.0354095369137, -CHAMFER1_SIZE * 0.999372885712), (0, 0), align=None)
    chamfer1_piece_2 = extrude(amount=204.018345075, mode=Mode.PRIVATE)
    chamfer1_piece_2 = split(chamfer1_piece_2, bisect_by=Plane(origin=(86.36, -0.073231983, -149.86), z_dir=(0, 0, 1)), keep=Keep.TOP, mode=Mode.PRIVATE)
    chamfer1_piece_2 = split(chamfer1_piece_2, bisect_by=Plane(origin=(2.54, -0.073231983, -114.387274478), z_dir=(1, 0, 0)), keep=Keep.TOP, mode=Mode.PRIVATE)
    chamfer1_piece_2 = split(chamfer1_piece_2, bisect_by=Plane(origin=(90.17, -0.073231983, -114.387274478), z_dir=(-1, 0, 0)), keep=Keep.TOP, mode=Mode.PRIVATE)
    add(chamfer1_piece_2, mode=Mode.SUBTRACT)

    # Fillet2
    fillet2_edges = [part.edges().sort_by_distance(p)[0] for p in [
        (86.36, -31.75, -114.3),
        (86.36, -31.75, -152.4),
        (40.64, -31.75, -114.3),
        (40.64, -31.75, -152.4),
    ]]
    fillet(fillet2_edges, radius=FILLET2_R - 0.0001)  # a hair under: the kernel refuses the full size

    # Sketch27 → Cut-Extrude11 (cut)
    with BuildSketch(Plane.ZY.offset(-36.83)):
        with Locations((-133.35, -12.7)):
            Circle(SKETCH27_R)
    extrude(amount=-CUT_EXTRUDE11_DEPTH, mode=Mode.SUBTRACT)

    # Sketch28 → Boss-Extrude6 (add)
    with BuildSketch(Plane.ZY.offset(-124.46)):
        with Locations((-121.96, 30)):
            Rectangle(SKETCH28_W, SKETCH28_H)
        with Locations((-87.844, 30)):
            Rectangle(SKETCH28_W, SKETCH28_H)
    extrude(amount=BOSS_EXTRUDE6_DEPTH)

    # Sketch29 → Cut-Extrude13 (cut, up to next)
    with BuildSketch(Plane(origin=(127, 0, 0), x_dir=(0, 0, -1), z_dir=(1, 0, 0)), mode=Mode.PRIVATE) as cut_extrude13_sk1:
        with Locations((87.844, 52.379999946)):
            Circle(SKETCH29_R)
    cut_extrude13_tool1 = extrude(cut_extrude13_sk1.sketch, amount=-CUT_EXTRUDE13_REACH, mode=Mode.PRIVATE) & part.part
    # Sketch29 → Cut-Extrude13 (cut, up to next)
    with BuildSketch(Plane(origin=(127, 0, 0), x_dir=(0, 0, -1), z_dir=(1, 0, 0)), mode=Mode.PRIVATE) as cut_extrude13_sk2:
        with Locations((87.844, 30.379999946)):
            Circle(SKETCH29_R)
    cut_extrude13_tool2 = extrude(cut_extrude13_sk2.sketch, amount=-CUT_EXTRUDE13_REACH, mode=Mode.PRIVATE) & part.part
    # Sketch29 → Cut-Extrude13 (cut, up to next)
    with BuildSketch(Plane(origin=(127, 0, 0), x_dir=(0, 0, -1), z_dir=(1, 0, 0)), mode=Mode.PRIVATE) as cut_extrude13_sk3:
        with Locations((87.844, 8.281999946)):
            Circle(SKETCH29_R)
    cut_extrude13_tool3 = extrude(cut_extrude13_sk3.sketch, amount=-CUT_EXTRUDE13_REACH, mode=Mode.PRIVATE) & part.part
    # Sketch29 → Cut-Extrude13 (cut, up to next)
    with BuildSketch(Plane(origin=(127, 0, 0), x_dir=(0, 0, -1), z_dir=(1, 0, 0)), mode=Mode.PRIVATE) as cut_extrude13_sk4:
        with Locations((121.92, 52.281999946)):
            Circle(SKETCH29_R)
    cut_extrude13_tool4 = extrude(cut_extrude13_sk4.sketch, amount=-CUT_EXTRUDE13_REACH, mode=Mode.PRIVATE) & part.part
    # Sketch29 → Cut-Extrude13 (cut, up to next)
    with BuildSketch(Plane(origin=(127, 0, 0), x_dir=(0, 0, -1), z_dir=(1, 0, 0)), mode=Mode.PRIVATE) as cut_extrude13_sk5:
        with Locations((121.92, 8.281999946)):
            Circle(SKETCH29_R)
    cut_extrude13_tool5 = extrude(cut_extrude13_sk5.sketch, amount=-CUT_EXTRUDE13_REACH, mode=Mode.PRIVATE) & part.part
    # Sketch29 → Cut-Extrude13 (cut, up to next)
    with BuildSketch(Plane(origin=(127, 0, 0), x_dir=(0, 0, -1), z_dir=(1, 0, 0)), mode=Mode.PRIVATE) as cut_extrude13_sk6:
        with Locations((121.92, 30.281999946)):
            Circle(SKETCH29_R)
    cut_extrude13_tool6 = extrude(cut_extrude13_sk6.sketch, amount=-CUT_EXTRUDE13_REACH, mode=Mode.PRIVATE) & part.part
    add(cut_extrude13_tool1.solids().sort_by_distance((127, 52.38, -87.844))[0], mode=Mode.SUBTRACT)
    add(cut_extrude13_tool2.solids().sort_by_distance((127, 30.38, -87.844))[0], mode=Mode.SUBTRACT)
    add(cut_extrude13_tool3.solids().sort_by_distance((127, 8.282, -87.844))[0], mode=Mode.SUBTRACT)
    add(cut_extrude13_tool4.solids().sort_by_distance((127, 52.282, -121.92))[0], mode=Mode.SUBTRACT)
    add(cut_extrude13_tool5.solids().sort_by_distance((127, 8.282, -121.92))[0], mode=Mode.SUBTRACT)
    add(cut_extrude13_tool6.solids().sort_by_distance((127, 30.282, -121.92))[0], mode=Mode.SUBTRACT)

    # Sketch30 → Cut-Extrude14 (cut)
    with BuildSketch(Plane.ZY.offset(-82.55)):
        with Locations((-115.246305977, 11.965498349)):
            Rectangle(SKETCH30_W, SKETCH30_H)
    extrude(amount=-CUT_EXTRUDE14_DEPTH, mode=Mode.SUBTRACT)

    # Sketch31 → Cut-Extrude15 (cut)
    with BuildSketch(Plane.XZ):
        with Locations((63.5, -151.13)):
            Rectangle(SKETCH31_W, SKETCH31_H)
    extrude(amount=-CUT_EXTRUDE15_DEPTH, mode=Mode.SUBTRACT)


solid = part.part
